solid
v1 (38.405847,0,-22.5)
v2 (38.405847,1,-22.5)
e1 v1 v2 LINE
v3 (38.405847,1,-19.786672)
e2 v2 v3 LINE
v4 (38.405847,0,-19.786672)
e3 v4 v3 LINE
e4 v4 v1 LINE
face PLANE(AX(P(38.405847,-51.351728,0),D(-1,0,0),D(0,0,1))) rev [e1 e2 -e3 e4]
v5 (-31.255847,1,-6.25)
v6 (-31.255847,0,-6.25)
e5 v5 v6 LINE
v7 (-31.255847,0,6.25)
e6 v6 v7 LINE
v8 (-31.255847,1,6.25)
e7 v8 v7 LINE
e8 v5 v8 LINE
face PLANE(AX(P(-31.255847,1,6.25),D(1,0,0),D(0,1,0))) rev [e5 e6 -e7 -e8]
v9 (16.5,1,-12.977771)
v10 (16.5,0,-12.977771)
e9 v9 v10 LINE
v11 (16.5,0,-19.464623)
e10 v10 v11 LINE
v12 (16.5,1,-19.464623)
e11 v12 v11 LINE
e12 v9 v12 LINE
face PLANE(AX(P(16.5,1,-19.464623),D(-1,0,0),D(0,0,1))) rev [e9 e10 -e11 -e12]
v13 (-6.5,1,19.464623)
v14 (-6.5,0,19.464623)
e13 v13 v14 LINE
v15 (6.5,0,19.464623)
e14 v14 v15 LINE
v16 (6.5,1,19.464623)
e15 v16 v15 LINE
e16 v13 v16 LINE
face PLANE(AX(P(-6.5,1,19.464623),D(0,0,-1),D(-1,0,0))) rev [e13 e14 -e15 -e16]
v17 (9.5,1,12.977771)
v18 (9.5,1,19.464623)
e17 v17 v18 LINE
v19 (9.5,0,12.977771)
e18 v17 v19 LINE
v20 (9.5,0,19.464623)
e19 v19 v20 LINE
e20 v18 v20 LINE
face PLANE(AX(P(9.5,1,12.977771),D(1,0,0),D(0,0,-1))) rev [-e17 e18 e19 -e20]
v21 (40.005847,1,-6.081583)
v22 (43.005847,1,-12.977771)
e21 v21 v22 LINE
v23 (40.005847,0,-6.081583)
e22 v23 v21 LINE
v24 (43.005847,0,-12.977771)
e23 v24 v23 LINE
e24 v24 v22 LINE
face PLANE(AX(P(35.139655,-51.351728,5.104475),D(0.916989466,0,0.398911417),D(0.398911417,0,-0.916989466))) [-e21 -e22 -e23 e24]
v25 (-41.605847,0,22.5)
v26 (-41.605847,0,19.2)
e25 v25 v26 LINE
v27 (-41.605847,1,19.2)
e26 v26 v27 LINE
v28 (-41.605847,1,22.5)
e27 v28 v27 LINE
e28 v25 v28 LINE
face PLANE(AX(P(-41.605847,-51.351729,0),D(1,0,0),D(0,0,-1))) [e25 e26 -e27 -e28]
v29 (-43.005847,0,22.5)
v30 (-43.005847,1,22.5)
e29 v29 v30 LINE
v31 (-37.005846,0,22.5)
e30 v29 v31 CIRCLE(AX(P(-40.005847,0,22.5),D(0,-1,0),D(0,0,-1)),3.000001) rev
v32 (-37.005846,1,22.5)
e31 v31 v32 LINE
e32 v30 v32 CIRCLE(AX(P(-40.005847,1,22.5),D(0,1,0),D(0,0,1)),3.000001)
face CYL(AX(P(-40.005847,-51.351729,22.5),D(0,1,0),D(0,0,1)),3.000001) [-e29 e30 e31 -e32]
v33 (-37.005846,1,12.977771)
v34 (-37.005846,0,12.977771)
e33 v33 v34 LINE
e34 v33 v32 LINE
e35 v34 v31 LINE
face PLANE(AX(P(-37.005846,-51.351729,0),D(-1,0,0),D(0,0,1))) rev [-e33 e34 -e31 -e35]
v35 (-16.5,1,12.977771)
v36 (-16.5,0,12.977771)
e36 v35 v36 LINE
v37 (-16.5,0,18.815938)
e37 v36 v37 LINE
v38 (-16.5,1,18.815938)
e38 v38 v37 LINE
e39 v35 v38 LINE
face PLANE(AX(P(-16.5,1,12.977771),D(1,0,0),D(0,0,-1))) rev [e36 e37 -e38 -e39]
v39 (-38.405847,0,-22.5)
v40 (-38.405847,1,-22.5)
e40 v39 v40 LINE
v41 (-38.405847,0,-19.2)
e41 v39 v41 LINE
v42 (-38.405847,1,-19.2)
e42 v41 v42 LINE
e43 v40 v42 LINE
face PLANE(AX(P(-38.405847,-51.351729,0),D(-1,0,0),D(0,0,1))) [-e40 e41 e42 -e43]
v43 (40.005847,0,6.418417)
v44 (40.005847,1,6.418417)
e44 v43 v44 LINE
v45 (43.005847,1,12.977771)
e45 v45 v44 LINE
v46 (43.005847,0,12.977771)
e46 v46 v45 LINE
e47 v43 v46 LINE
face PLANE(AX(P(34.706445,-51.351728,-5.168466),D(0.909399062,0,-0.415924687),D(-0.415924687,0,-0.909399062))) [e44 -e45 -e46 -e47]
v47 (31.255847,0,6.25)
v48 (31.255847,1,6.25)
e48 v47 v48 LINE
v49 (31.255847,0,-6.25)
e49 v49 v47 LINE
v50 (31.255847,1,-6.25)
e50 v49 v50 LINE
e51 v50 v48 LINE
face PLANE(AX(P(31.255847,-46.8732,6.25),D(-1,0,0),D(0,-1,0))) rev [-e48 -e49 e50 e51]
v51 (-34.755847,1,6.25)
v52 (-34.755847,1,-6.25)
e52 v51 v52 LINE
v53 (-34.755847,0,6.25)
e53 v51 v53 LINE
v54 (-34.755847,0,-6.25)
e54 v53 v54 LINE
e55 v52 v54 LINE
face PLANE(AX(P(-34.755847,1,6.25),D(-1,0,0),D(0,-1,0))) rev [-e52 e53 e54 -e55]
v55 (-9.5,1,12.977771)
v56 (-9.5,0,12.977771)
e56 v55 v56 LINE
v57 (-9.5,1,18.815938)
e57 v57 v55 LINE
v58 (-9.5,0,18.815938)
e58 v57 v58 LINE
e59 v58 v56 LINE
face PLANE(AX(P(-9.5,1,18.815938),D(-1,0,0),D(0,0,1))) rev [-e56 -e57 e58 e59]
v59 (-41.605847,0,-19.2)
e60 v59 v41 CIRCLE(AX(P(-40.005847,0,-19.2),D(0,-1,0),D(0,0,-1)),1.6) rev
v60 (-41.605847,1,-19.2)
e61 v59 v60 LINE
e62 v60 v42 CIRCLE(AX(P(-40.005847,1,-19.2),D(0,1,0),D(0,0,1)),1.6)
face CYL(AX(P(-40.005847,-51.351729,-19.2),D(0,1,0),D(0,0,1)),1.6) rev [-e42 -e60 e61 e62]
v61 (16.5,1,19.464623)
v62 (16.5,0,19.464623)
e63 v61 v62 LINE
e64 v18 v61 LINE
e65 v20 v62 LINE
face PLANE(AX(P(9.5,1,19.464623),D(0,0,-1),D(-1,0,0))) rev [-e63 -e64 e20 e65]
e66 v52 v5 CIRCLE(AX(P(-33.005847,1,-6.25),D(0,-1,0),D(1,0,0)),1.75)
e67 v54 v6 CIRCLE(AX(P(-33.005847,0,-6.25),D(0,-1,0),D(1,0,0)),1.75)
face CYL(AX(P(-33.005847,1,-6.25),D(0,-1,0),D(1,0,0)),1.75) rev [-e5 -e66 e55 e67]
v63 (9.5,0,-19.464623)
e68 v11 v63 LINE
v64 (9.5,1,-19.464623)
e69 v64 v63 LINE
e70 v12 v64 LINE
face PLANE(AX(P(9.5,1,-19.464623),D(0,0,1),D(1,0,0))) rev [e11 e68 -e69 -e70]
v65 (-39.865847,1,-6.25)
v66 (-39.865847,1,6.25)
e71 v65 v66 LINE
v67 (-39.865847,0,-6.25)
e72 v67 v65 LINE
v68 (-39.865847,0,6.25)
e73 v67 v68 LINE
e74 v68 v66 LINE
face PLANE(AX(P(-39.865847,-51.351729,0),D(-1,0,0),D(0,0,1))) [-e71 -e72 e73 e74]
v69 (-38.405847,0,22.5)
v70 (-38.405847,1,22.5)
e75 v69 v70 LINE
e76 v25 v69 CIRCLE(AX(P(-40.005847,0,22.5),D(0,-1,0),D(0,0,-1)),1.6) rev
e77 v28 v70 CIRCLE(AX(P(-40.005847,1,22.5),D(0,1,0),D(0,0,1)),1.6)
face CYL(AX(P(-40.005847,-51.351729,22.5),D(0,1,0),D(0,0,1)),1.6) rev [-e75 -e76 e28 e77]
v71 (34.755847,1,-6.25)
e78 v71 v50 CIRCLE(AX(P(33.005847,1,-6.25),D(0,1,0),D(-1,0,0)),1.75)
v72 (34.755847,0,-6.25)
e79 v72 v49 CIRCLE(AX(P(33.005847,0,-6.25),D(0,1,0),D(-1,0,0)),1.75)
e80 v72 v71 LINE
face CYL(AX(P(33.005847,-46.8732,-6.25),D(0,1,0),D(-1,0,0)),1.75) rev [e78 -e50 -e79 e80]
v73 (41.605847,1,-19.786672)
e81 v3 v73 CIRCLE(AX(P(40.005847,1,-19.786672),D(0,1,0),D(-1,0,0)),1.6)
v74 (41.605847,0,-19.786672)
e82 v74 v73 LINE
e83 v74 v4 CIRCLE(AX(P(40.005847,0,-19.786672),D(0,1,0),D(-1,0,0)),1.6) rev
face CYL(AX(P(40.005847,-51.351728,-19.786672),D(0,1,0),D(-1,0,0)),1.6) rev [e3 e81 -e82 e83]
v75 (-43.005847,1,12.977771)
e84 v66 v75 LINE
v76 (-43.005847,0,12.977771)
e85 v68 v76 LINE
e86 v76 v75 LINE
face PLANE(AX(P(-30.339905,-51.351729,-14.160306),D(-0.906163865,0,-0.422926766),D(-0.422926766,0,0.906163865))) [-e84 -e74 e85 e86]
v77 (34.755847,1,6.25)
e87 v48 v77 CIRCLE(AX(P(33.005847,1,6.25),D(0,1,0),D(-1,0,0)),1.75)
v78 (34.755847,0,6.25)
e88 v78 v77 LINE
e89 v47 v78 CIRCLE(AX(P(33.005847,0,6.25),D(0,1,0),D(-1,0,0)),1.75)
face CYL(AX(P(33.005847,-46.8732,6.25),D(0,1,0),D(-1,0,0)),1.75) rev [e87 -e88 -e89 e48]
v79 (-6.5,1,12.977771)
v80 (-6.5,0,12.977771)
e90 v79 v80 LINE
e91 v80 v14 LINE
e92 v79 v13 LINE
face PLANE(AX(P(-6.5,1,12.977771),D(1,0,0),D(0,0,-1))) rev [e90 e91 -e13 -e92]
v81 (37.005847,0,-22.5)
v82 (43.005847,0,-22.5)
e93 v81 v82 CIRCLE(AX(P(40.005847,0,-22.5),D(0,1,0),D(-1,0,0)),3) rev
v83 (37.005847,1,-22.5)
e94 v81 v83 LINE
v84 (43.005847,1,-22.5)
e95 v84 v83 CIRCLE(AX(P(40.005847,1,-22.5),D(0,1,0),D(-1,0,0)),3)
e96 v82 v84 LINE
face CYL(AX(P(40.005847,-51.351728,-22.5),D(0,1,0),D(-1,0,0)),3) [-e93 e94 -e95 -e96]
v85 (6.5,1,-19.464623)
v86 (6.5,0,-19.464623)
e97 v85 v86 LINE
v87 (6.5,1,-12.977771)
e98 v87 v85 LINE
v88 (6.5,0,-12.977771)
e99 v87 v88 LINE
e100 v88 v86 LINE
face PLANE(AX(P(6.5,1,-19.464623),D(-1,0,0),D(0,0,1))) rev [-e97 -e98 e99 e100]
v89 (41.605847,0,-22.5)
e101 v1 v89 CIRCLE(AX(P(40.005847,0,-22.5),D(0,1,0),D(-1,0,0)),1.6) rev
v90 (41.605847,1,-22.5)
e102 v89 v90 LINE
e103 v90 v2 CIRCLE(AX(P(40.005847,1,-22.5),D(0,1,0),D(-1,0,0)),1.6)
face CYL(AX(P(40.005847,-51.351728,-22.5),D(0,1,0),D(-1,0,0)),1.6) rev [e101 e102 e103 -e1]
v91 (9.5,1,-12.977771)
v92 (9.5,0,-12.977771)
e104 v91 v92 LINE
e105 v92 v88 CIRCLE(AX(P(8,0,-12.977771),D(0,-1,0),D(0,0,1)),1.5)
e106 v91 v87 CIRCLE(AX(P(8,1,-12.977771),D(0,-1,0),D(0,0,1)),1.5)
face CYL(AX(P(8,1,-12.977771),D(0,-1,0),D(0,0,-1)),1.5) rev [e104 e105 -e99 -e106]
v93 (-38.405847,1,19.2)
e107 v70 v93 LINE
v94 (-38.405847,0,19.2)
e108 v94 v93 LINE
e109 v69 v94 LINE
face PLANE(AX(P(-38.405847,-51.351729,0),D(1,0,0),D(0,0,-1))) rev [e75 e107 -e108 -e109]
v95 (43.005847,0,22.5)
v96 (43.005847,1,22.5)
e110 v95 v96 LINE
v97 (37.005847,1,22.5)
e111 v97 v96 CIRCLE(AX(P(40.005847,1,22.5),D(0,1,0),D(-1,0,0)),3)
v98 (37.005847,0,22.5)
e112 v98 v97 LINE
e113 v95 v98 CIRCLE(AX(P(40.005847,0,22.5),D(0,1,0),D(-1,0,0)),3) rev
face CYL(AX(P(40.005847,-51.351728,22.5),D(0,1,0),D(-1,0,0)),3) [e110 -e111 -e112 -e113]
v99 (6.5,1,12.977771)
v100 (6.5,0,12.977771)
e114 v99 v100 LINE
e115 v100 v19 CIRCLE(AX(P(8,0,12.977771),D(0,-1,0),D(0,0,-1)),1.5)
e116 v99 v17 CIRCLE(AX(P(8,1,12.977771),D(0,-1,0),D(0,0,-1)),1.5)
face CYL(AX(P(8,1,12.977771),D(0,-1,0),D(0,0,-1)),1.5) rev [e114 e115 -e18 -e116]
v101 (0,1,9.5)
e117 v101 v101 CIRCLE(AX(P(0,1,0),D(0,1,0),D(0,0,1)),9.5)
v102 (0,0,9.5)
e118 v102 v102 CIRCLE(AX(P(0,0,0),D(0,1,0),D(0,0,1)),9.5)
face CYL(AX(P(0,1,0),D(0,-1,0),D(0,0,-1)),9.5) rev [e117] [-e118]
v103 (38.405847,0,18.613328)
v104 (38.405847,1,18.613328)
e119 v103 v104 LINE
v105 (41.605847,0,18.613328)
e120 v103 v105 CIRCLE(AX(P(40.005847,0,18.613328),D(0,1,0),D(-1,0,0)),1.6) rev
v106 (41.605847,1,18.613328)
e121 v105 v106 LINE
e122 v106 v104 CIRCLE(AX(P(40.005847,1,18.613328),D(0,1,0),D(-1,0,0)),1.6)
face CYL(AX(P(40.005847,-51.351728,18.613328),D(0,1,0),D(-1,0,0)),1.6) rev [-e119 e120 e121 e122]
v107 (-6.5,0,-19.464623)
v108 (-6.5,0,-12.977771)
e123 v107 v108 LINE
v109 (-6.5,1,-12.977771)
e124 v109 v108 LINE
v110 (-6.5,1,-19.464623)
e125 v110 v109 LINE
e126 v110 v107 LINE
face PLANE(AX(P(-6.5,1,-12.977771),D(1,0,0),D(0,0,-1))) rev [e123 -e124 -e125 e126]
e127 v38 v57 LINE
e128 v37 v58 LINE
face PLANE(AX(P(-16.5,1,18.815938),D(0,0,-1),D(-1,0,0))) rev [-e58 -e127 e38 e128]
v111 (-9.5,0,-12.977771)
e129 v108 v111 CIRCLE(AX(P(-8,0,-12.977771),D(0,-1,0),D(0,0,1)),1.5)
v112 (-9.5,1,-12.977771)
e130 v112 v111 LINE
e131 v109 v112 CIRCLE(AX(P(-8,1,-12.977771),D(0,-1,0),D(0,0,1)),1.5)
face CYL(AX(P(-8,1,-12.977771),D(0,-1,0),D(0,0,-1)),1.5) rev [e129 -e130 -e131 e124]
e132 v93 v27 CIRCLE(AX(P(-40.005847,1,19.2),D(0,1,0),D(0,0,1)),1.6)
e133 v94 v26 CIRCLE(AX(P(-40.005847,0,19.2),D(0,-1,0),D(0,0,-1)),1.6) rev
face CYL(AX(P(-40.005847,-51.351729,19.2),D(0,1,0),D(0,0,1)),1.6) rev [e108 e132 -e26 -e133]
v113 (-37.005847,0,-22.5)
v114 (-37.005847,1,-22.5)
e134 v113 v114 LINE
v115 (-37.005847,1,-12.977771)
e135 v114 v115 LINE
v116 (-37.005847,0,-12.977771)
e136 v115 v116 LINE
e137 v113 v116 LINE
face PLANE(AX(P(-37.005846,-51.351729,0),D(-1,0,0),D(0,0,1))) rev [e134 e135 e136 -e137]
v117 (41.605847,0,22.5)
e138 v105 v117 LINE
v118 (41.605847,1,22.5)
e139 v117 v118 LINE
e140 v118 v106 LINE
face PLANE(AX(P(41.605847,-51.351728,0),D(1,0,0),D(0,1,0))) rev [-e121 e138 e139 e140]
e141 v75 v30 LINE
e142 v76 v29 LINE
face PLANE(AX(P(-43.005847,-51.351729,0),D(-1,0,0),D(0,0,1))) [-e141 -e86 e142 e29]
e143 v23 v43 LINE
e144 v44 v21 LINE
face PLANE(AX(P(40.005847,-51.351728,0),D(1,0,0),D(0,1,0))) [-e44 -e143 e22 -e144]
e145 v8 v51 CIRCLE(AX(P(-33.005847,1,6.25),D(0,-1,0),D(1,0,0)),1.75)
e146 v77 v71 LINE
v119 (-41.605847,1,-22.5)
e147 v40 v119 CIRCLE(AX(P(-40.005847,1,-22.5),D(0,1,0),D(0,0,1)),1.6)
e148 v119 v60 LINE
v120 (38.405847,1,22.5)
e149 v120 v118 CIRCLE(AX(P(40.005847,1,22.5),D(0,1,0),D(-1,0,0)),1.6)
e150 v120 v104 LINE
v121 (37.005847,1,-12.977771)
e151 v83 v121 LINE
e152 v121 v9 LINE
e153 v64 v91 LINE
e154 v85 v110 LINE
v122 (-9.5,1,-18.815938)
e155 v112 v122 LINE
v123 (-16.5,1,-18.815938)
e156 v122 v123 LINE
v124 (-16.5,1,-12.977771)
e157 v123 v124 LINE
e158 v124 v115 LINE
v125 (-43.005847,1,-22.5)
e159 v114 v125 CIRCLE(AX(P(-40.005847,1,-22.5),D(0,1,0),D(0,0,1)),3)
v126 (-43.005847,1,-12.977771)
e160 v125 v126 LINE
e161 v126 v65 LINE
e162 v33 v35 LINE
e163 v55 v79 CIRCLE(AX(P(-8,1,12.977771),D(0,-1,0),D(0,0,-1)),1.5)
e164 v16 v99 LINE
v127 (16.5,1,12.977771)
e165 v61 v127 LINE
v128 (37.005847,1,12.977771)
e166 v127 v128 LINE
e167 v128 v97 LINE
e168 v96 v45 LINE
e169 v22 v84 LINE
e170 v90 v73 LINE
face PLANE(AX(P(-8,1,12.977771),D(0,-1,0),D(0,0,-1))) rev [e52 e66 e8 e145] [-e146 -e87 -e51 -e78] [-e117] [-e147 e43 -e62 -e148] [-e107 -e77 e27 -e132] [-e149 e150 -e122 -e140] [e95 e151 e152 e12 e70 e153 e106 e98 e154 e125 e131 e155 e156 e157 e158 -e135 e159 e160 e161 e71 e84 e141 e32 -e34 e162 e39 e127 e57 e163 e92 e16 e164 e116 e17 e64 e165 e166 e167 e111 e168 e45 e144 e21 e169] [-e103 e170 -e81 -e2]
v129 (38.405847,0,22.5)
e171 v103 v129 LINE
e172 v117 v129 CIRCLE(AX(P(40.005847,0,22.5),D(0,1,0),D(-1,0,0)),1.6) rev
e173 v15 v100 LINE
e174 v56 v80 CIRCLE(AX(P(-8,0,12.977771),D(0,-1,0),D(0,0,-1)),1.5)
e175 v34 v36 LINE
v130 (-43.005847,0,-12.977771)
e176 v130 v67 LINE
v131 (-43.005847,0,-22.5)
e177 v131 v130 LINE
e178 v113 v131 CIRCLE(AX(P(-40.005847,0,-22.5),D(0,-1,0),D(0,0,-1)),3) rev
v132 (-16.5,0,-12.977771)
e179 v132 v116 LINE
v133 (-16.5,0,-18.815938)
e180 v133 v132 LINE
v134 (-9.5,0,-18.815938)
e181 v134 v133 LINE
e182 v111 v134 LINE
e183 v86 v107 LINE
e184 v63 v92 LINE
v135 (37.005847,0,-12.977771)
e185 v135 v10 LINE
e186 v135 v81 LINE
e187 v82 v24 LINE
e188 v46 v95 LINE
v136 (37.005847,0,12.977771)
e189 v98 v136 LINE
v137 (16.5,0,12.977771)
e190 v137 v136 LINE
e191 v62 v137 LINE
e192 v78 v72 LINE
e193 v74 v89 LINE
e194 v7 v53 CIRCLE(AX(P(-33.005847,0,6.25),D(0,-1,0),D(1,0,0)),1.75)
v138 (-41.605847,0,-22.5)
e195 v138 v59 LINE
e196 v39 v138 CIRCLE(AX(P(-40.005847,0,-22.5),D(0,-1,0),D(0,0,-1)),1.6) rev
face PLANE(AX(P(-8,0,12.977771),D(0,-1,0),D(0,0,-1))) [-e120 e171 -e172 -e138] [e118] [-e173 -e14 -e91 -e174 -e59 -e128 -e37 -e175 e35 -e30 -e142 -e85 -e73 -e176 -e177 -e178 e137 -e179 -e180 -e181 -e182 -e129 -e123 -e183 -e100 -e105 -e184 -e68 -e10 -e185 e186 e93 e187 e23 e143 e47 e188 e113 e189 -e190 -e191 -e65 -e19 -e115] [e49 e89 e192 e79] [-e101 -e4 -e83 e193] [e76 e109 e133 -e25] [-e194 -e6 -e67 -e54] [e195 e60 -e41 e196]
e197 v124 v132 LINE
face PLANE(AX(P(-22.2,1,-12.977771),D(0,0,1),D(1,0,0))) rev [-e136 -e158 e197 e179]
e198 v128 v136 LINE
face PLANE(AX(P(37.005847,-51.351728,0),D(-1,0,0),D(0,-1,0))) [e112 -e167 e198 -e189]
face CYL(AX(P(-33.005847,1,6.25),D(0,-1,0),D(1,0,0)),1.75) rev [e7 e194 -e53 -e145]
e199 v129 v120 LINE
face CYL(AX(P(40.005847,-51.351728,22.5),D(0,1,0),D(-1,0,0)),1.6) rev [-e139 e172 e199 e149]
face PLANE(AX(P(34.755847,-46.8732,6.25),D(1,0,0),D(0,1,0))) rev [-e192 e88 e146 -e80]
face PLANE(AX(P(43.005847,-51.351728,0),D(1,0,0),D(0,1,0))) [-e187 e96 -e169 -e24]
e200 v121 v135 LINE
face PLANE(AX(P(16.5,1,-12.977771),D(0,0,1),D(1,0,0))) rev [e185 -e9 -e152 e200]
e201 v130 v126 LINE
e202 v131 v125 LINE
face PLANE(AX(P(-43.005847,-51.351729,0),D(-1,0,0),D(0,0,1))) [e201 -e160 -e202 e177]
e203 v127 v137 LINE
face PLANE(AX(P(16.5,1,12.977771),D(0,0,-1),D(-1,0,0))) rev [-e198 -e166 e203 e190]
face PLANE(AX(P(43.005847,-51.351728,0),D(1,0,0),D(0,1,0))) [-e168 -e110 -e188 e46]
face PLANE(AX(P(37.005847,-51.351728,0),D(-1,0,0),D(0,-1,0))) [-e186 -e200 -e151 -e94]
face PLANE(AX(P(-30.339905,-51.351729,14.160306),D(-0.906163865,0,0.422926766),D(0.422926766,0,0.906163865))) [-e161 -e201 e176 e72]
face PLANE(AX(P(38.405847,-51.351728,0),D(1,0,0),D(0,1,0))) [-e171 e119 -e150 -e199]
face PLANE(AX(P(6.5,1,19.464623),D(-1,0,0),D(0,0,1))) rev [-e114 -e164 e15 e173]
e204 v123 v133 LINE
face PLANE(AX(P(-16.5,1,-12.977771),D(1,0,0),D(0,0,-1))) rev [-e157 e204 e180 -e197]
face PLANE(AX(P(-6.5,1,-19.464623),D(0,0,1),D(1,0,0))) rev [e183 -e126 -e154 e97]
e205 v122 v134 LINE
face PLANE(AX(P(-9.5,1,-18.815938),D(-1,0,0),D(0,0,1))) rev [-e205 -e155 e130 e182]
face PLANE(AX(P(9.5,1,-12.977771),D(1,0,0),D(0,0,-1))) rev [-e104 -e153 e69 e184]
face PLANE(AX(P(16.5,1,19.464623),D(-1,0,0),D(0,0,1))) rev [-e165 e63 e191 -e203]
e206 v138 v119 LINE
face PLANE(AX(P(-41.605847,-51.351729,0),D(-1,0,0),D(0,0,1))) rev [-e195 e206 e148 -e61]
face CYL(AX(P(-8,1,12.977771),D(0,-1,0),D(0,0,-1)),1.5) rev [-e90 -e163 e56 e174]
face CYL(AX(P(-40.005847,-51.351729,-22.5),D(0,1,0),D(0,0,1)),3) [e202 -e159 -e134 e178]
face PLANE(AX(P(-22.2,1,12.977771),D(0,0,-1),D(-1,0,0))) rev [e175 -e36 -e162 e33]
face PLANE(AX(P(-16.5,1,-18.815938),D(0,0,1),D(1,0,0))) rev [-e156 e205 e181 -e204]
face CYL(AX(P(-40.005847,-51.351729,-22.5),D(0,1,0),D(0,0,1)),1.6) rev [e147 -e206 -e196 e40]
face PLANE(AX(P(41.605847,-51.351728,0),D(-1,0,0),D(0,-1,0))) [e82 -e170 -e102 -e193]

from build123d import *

# Parameters (mm, degrees)
SKETCH1_R                 = 9.5
BASE_FLANGE1_DEPTH        = 1
EDGE_FLANGE1_DEPTH        = 25.955542515
EDGE_FLANGE1_BEND_DEPTH   = 25.955542515
CUT_EXTRUDE1_DEPTH        = 54.438514327
CUT_EXTRUDE1_DEPTH_BACK   = 54.438514327
BOSS_EXTRUDE1_DEPTH       = 1
BOSS_EXTRUDE2_START       = -23.9366
BOSS_EXTRUDE2_DEPTH       = 47.8732
BOSS_EXTRUDE2_START_2     = -31.255846738
BOSS_EXTRUDE2_2_OUTLINE_W = 1
BOSS_EXTRUDE2_2_OUTLINE_H = 25.955542514
BOSS_EXTRUDE2_2_DEPTH     = 14.755846738
BOSS_EXTRUDE2_START_3     = 16.5
BOSS_EXTRUDE2_3_OUTLINE_W = 1
BOSS_EXTRUDE2_3_OUTLINE_H = 25.955542514
BOSS_EXTRUDE2_3_DEPTH     = 14.755846738
BOSS_EXTRUDE2_START_4     = 34.755846738
BOSS_EXTRUDE2_4_OUTLINE_W = 1
BOSS_EXTRUDE2_4_OUTLINE_H = 25.955542514
BOSS_EXTRUDE2_4_DEPTH     = 5.25
BOSS_EXTRUDE2_START_5     = -39.865847056
BOSS_EXTRUDE2_5_OUTLINE_W = 1
BOSS_EXTRUDE2_5_OUTLINE_H = 25.955542514
BOSS_EXTRUDE2_5_DEPTH     = 5.110000318
BOSS_EXTRUDE2_6_DEPTH     = 1


with BuildPart() as part:
    # Base-Flange1: sheet metal written as solids
    # Sketch1 → Base-Flange1 (new body)
    with BuildSketch(Plane(origin=(0, 0, 0), x_dir=(1, 0, 0), z_dir=(0, 1, 0))):
        with BuildLine():
            Line((-22.2, -12.977771257), (-22.2, 12.977771257))
            Line((-22.2, 12.977771257), (-16.5, 12.977771257))
            Line((-16.5, 12.977771257), (-16.5, 18.815937518))
            Line((-16.5, 18.815937518), (-9.5, 18.815937518))
            Line((-9.5, 18.815937518), (-9.5, 12.977771257))
            ThreePointArc((-9.5, 12.977771257), (-8, 11.477771257), (-6.5, 12.977771257))
            Line((-6.5, 12.977771257), (-6.5, 19.464622659))
            Line((-6.5, 19.464622659), (6.5, 19.464622659))
            Line((6.5, 19.464622659), (6.5, 12.977771257))
            ThreePointArc((6.5, 12.977771257), (8, 11.477771257), (9.5, 12.977771257))
            Line((9.5, 12.977771257), (9.5, 19.464622659))
            Line((9.5, 19.464622659), (16.5, 19.464622659))
            Line((16.5, 19.464622659), (16.5, 12.977771257))
            Line((16.5, 12.977771257), (22.2, 12.977771257))
            Line((22.2, 12.977771257), (22.2, -12.977771257))
            Line((22.2, -12.977771257), (16.5, -12.977771257))
            Line((16.5, -12.977771257), (16.5, -19.464622659))
            Line((16.5, -19.464622659), (9.5, -19.464622659))
            Line((9.5, -19.464622659), (9.5, -12.977771257))
            ThreePointArc((9.5, -12.977771257), (8, -11.477771257), (6.5, -12.977771257))
            Line((6.5, -12.977771257), (6.5, -19.464622659))
            Line((6.5, -19.464622659), (-6.5, -19.464622659))
            Line((-6.5, -19.464622659), (-6.5, -12.977771257))
            ThreePointArc((-6.5, -12.977771257), (-8, -11.477771257), (-9.5, -12.977771257))
            Line((-9.5, -12.977771257), (-9.5, -18.815937518))
            Line((-9.5, -18.815937518), (-16.5, -18.815937518))
            Line((-16.5, -18.815937518), (-16.5, -12.977771257))
            Line((-16.5, -12.977771257), (-22.2, -12.977771257))
        make_face()
        with Locations(Location((0, 0, 0), (0, 0, 270))):
            Circle(SKETCH1_R, mode=Mode.SUBTRACT)
    extrude(amount=BASE_FLANGE1_DEPTH)

    # Edge-Flange1: sheet metal written as solids
    # Edge-Flange1 section (on a plane across the edge) → Edge-Flange1 (add)
    with BuildSketch(Plane(origin=(22.9366, 0, -12.977771257), x_dir=(-1, 0, 0), z_dir=(0, 0, 1))):
        with BuildLine():
            Line((-1, 0.7366), (-1, 13.6))
            Line((-1, 13.6), (0, 13.6))
            Line((0, 13.6), (0, 0.7366))
            ThreePointArc((0, 0.7366), (0.215745145, 0.215745145), (0.7366, 0))
            Line((0.7366, 0), (0.7366, -1))
            ThreePointArc((0.7366, -1), (-0.491361636, -0.491361636), (-1, 0.7366))
        make_face()
    extrude(amount=EDGE_FLANGE1_DEPTH)

    # Edge-Flange1 section 2 (on a plane across the edge) → Edge-Flange1 bend (add)
    with BuildSketch(Plane(origin=(-22.9366, 0, 12.977771257), x_dir=(1, 0, 0), z_dir=(0, 0, -1))):
        with BuildLine():
            Line((-1, 0.7366), (-1, 13.6))
            Line((-1, 13.6), (0, 13.6))
            Line((0, 13.6), (0, 0.7366))
            ThreePointArc((0, 0.7366), (0.215745145, 0.215745145), (0.7366, 0))
            Line((0.7366, 0), (0.7366, -1))
            ThreePointArc((0.7366, -1), (-0.491361636, -0.491361636), (-1, 0.7366))
        make_face()
    extrude(amount=EDGE_FLANGE1_BEND_DEPTH)

    # Sketch16 → Cut-Extrude1 (cut, two sides: drawn at the far end of the back side and taken through both)
    with BuildSketch(Plane(origin=(23.9366, 0, 0), x_dir=(0, 0, -1), z_dir=(1, 0, 0)).offset(-CUT_EXTRUDE1_DEPTH_BACK)):
        with BuildLine():
            Line((-6.25, -7.85), (6.25, -7.85))
            ThreePointArc((6.25, -7.85), (8, -9.6), (6.25, -11.35))
            Line((6.25, -11.35), (-6.25, -11.35))
            ThreePointArc((-6.25, -11.35), (-8, -9.6), (-6.25, -7.85))
        make_face()
    extrude(amount=CUT_EXTRUDE1_DEPTH + CUT_EXTRUDE1_DEPTH_BACK, mode=Mode.SUBTRACT)

    # Sketch17 → Boss-Extrude1 (add)
    with BuildSketch(Plane(origin=(23.9366, 0, 0), x_dir=(0, 0, -1), z_dir=(1, 0, 0))):
        with BuildLine():
            Line((12.977771257, -19.6), (22.5, -19.6))
            ThreePointArc((22.5, -19.6), (25.5, -16.6), (22.5, -13.6))
            Line((22.5, -13.6), (12.977771257, -13.6))
            Line((12.977771257, -13.6), (-12.977771257, -13.6))
            Line((-12.977771257, -13.6), (-22.5, -13.6))
            ThreePointArc((-22.5, -13.6), (-25.5, -16.6), (-22.5, -19.6))
            Line((-22.5, -19.6), (-12.977771257, -19.6))
            Line((-12.977771257, -19.6), (-6.418417428, -16.6))
            Line((-6.418417428, -16.6), (6.081582572, -16.6))
            Line((6.081582572, -16.6), (12.977771257, -19.6))
        make_face()
        with BuildLine():
            ThreePointArc((19.786671521, -15), (18.186671521, -16.6), (19.786671521, -18.2))
            Line((19.786671521, -18.2), (22.5, -18.2))
            ThreePointArc((22.5, -18.2), (24.1, -16.6), (22.5, -15))
            Line((22.5, -15), (19.786671521, -15))
        make_face(mode=Mode.SUBTRACT)
        with BuildLine():
            ThreePointArc((-18.613328479, -18.2), (-17.013328479, -16.6), (-18.613328479, -15))
            Line((-18.613328479, -15), (-22.5, -15))
            ThreePointArc((-22.5, -15), (-24.1, -16.6), (-22.5, -18.2))
            Line((-22.5, -18.2), (-18.613328479, -18.2))
        make_face(mode=Mode.SUBTRACT)
    extrude(amount=-BOSS_EXTRUDE1_DEPTH)

    # Boss-Extrude2: read off the stored shape, not the designer's step
    # Boss-Extrude2 outline → Boss-Extrude2 (cut)
    with BuildSketch(Plane.YZ.offset(BOSS_EXTRUDE2_START)):
        with BuildLine():
            Line((0, -12.977771257), (0, 12.977771257))
            Line((0, 12.977771257), (-13.6, 12.977771257))
            Line((-13.6, 12.977771257), (-13.6, 22.5))
            ThreePointArc((-13.6, 22.5), (-16.6, 25.5), (-19.6, 22.5))
            Line((-19.6, 22.5), (-19.6, 12.977771257))
            Line((-19.6, 12.977771257), (-16.6, 6.418417428))
            Line((-16.6, 6.418417428), (-16.6, -6.081582572))
            Line((-16.6, -6.081582572), (-19.6, -12.977771257))
            Line((-19.6, -12.977771257), (-19.6, -22.5))
            ThreePointArc((-19.6, -22.5), (-16.6, -25.5), (-13.6, -22.5))
            Line((-13.6, -22.5), (-13.6, -12.977771257))
            Line((-13.6, -12.977771257), (0, -12.977771257))
        make_face()
        with BuildLine():
            Line((-11.35, -6.25), (-11.35, 6.25))
            ThreePointArc((-11.35, 6.25), (-9.6, 8), (-7.85, 6.25))
            Line((-7.85, 6.25), (-7.85, -6.25))
            ThreePointArc((-7.85, -6.25), (-9.6, -8), (-11.35, -6.25))
        make_face(mode=Mode.SUBTRACT)
        with BuildLine():
            Line((-18.2, 18.613328479), (-18.2, 22.5))
            ThreePointArc((-18.2, 22.5), (-16.6, 24.1), (-15, 22.5))
            Line((-15, 22.5), (-15, 18.613328479))
            ThreePointArc((-15, 18.613328479), (-16.6, 17.013328479), (-18.2, 18.613328479))
        make_face(mode=Mode.SUBTRACT)
        with BuildLine():
            Line((-15, -19.786671521), (-15, -22.5))
            ThreePointArc((-15, -22.5), (-16.6, -24.1), (-18.2, -22.5))
            Line((-18.2, -22.5), (-18.2, -19.786671521))
            ThreePointArc((-18.2, -19.786671521), (-16.6, -18.186671521), (-15, -19.786671521))
        make_face(mode=Mode.SUBTRACT)
    extrude(amount=BOSS_EXTRUDE2_DEPTH, mode=Mode.SUBTRACT)

    # Boss-Extrude2 2 outline → Boss-Extrude2 2 (add)
    with BuildSketch(Plane.YZ.offset(BOSS_EXTRUDE2_START_2)):
        with Locations((0.5, 0)):
            Rectangle(BOSS_EXTRUDE2_2_OUTLINE_W, BOSS_EXTRUDE2_2_OUTLINE_H)
    extrude(amount=BOSS_EXTRUDE2_2_DEPTH)

    # Boss-Extrude2 3 outline → Boss-Extrude2 3 (add)
    with BuildSketch(Plane.YZ.offset(BOSS_EXTRUDE2_START_3)):
        with Locations((0.5, 0)):
            Rectangle(BOSS_EXTRUDE2_3_OUTLINE_W, BOSS_EXTRUDE2_3_OUTLINE_H)
    extrude(amount=BOSS_EXTRUDE2_3_DEPTH)



with BuildPart() as body_2:
    # Boss-Extrude2 4 outline → Boss-Extrude2 4 (new body)
    with BuildSketch(Plane.YZ.offset(BOSS_EXTRUDE2_START_4)):
        with Locations((0.5, 0)):
            Rectangle(BOSS_EXTRUDE2_4_OUTLINE_W, BOSS_EXTRUDE2_4_OUTLINE_H)
    extrude(amount=BOSS_EXTRUDE2_4_DEPTH)


with BuildPart() as body_3:
    # Boss-Extrude2 5 outline → Boss-Extrude2 5 (new body)
    with BuildSketch(Plane.YZ.offset(BOSS_EXTRUDE2_START_5)):
        with Locations((0.5, 0)):
            Rectangle(BOSS_EXTRUDE2_5_OUTLINE_W, BOSS_EXTRUDE2_5_OUTLINE_H)
    extrude(amount=BOSS_EXTRUDE2_5_DEPTH)


with BuildPart() as part_1:
    add(part.part)

    add(body_2.part)  # Boss-Extrude2 6 merges body 2

    add(body_3.part)  # Boss-Extrude2 6 merges body 3
    # Boss-Extrude2 6 outline → Boss-Extrude2 6 (add)
    # profile 1 of 8: a face of its own
    with BuildSketch(Plane(origin=(0, 0, 0), x_dir=(1, 0, 0), z_dir=(0, 1, 0))):
        with BuildLine():
            Line((-34.755846738, 12.977771257), (-34.755846738, 6.25))
            ThreePointArc((-34.755846738, 6.25), (-33.005846738, 8), (-31.255846738, 6.25))
            Line((-31.255846738, 6.25), (-31.255846738, 12.977771257))
            Line((-31.255846738, 12.977771257), (-34.755846738, 12.977771257))
        make_face()
    # profile 2 of 8: a face of its own
    with BuildSketch(Plane(origin=(0, 0, 0), x_dir=(1, 0, 0), z_dir=(0, 1, 0))):
        with BuildLine():
            ThreePointArc((-31.255846738, -6.25), (-33.005846738, -8), (-34.755846738, -6.25))
            Line((-34.755846738, -6.25), (-34.755846738, -12.977771257))
            Line((-34.755846738, -12.977771257), (-31.255846738, -12.977771257))
            Line((-31.255846738, -12.977771257), (-31.255846738, -6.25))
        make_face()
    # profile 3 of 8: a face of its own
    with BuildSketch(Plane(origin=(0, 0, 0), x_dir=(1, 0, 0), z_dir=(0, 1, 0))):
        with BuildLine():
            Line((-39.865847056, 12.977771257), (-37.005846146, 12.977771257))
            Line((-37.005846146, 12.977771257), (-37.005847056, 22.5000001))
            ThreePointArc((-37.005847056, 22.5000001), (-40.005847106, 25.5), (-43.005847056, 22.5))
            Line((-43.005847056, 22.5), (-43.005847056, 12.977771257))
            Line((-43.005847056, 12.977771257), (-39.865847056, 6.25))
            Line((-39.865847056, 6.25), (-39.865847056, 12.977771257))
        make_face()
        with BuildLine():
            ThreePointArc((-38.405847056, 19.2), (-40.005847056, 17.6), (-41.605847056, 19.2))
            Line((-41.605847056, 19.2), (-41.605847056, 22.5))
            ThreePointArc((-41.605847056, 22.5), (-40.005847056, 24.1), (-38.405847056, 22.5))
            Line((-38.405847056, 22.5), (-38.405847056, 19.2))
        make_face(mode=Mode.SUBTRACT)
    # profile 4 of 8: a face of its own
    with BuildSketch(Plane(origin=(0, 0, 0), x_dir=(1, 0, 0), z_dir=(0, 1, 0))):
        with BuildLine():
            Line((-37.005846304, -22.4999999), (-37.005845553, -12.977771257))
            Line((-37.005845553, -12.977771257), (-39.865847056, -12.977771257))
            Line((-39.865847056, -12.977771257), (-39.865847056, -6.25))
            Line((-39.865847056, -6.25), (-43.005847056, -12.977771257))
            Line((-43.005847056, -12.977771257), (-43.005847807, -22.5))
            ThreePointArc((-43.005847807, -22.5), (-40.005847005, -25.500000751), (-37.005846304, -22.4999999))
        make_face()
        with BuildLine():
            Line((-38.405847056, -19.2), (-38.405847056, -22.5))
            ThreePointArc((-38.405847056, -22.5), (-40.005847056, -24.1), (-41.605847056, -22.5))
            Line((-41.605847056, -22.5), (-41.605847056, -19.2))
            ThreePointArc((-41.605847056, -19.2), (-40.005847056, -17.6), (-38.405847056, -19.2))
        make_face(mode=Mode.SUBTRACT)
    # profile 5 of 8: a face of its own
    with BuildSketch(Plane(origin=(0, 0, 0), x_dir=(1, 0, 0), z_dir=(0, 1, 0))):
        with BuildLine():
            ThreePointArc((43.005846738, 22.5), (40.005846738, 25.5), (37.005846738, 22.5))
            Line((37.005846738, 22.5), (37.005846738, 12.977771257))
            Line((37.005846738, 12.977771257), (40.005846738, 12.977771257))
            Line((40.005846738, 12.977771257), (40.005846738, 6.081582572))
            Line((40.005846738, 6.081582572), (43.005846738, 12.977771257))
            Line((43.005846738, 12.977771257), (43.005846738, 22.5))
        make_face()
        with BuildLine():
            Line((38.405846738, 19.786671521), (38.405846738, 22.5))
            ThreePointArc((38.405846738, 22.5), (40.005846738, 24.1), (41.605846738, 22.5))
            Line((41.605846738, 22.5), (41.605846738, 19.786671521))
            ThreePointArc((41.605846738, 19.786671521), (40.005846738, 18.186671521), (38.405846738, 19.786671521))
        make_face(mode=Mode.SUBTRACT)
    # profile 6 of 8: a face of its own
    with BuildSketch(Plane(origin=(0, 0, 0), x_dir=(1, 0, 0), z_dir=(0, 1, 0))):
        with BuildLine():
            Line((34.755846738, 6.25), (34.755846738, 12.977771257))
            Line((34.755846738, 12.977771257), (31.255846738, 12.977771257))
            Line((31.255846738, 12.977771257), (31.255846738, 6.25))
            ThreePointArc((31.255846738, 6.25), (33.005846738, 8), (34.755846738, 6.25))
        make_face()
    # profile 7 of 8: a face of its own
    with BuildSketch(Plane(origin=(0, 0, 0), x_dir=(1, 0, 0), z_dir=(0, 1, 0))):
        with BuildLine():
            Line((34.755846738, -12.977771257), (34.755846738, -6.25))
            ThreePointArc((34.755846738, -6.25), (33.005846738, -8), (31.255846738, -6.25))
            Line((31.255846738, -6.25), (31.255846738, -12.977771257))
            Line((31.255846738, -12.977771257), (34.755846738, -12.977771257))
        make_face()
    # profile 8 of 8: a face of its own
    with BuildSketch(Plane(origin=(0, 0, 0), x_dir=(1, 0, 0), z_dir=(0, 1, 0))):
        with BuildLine():
            Line((43.005846738, -12.977771257), (40.005846738, -6.418417428))
            Line((40.005846738, -6.418417428), (40.005846738, -12.977771257))
            Line((40.005846738, -12.977771257), (37.005846738, -12.977771257))
            Line((37.005846738, -12.977771257), (37.005846738, -22.5))
            ThreePointArc((37.005846738, -22.5), (40.005846738, -25.5), (43.005846738, -22.5))
            Line((43.005846738, -22.5), (43.005846738, -12.977771257))
        make_face()
        with BuildLine():
            ThreePointArc((41.605846738, -22.5), (40.005846738, -24.1), (38.405846738, -22.5))
            Line((38.405846738, -22.5), (38.405846738, -18.613328479))
            ThreePointArc((38.405846738, -18.613328479), (40.005846738, -17.013328479), (41.605846738, -18.613328479))
            Line((41.605846738, -18.613328479), (41.605846738, -22.5))
        make_face(mode=Mode.SUBTRACT)
    extrude(amount=BOSS_EXTRUDE2_6_DEPTH)


solid = part_1.part
